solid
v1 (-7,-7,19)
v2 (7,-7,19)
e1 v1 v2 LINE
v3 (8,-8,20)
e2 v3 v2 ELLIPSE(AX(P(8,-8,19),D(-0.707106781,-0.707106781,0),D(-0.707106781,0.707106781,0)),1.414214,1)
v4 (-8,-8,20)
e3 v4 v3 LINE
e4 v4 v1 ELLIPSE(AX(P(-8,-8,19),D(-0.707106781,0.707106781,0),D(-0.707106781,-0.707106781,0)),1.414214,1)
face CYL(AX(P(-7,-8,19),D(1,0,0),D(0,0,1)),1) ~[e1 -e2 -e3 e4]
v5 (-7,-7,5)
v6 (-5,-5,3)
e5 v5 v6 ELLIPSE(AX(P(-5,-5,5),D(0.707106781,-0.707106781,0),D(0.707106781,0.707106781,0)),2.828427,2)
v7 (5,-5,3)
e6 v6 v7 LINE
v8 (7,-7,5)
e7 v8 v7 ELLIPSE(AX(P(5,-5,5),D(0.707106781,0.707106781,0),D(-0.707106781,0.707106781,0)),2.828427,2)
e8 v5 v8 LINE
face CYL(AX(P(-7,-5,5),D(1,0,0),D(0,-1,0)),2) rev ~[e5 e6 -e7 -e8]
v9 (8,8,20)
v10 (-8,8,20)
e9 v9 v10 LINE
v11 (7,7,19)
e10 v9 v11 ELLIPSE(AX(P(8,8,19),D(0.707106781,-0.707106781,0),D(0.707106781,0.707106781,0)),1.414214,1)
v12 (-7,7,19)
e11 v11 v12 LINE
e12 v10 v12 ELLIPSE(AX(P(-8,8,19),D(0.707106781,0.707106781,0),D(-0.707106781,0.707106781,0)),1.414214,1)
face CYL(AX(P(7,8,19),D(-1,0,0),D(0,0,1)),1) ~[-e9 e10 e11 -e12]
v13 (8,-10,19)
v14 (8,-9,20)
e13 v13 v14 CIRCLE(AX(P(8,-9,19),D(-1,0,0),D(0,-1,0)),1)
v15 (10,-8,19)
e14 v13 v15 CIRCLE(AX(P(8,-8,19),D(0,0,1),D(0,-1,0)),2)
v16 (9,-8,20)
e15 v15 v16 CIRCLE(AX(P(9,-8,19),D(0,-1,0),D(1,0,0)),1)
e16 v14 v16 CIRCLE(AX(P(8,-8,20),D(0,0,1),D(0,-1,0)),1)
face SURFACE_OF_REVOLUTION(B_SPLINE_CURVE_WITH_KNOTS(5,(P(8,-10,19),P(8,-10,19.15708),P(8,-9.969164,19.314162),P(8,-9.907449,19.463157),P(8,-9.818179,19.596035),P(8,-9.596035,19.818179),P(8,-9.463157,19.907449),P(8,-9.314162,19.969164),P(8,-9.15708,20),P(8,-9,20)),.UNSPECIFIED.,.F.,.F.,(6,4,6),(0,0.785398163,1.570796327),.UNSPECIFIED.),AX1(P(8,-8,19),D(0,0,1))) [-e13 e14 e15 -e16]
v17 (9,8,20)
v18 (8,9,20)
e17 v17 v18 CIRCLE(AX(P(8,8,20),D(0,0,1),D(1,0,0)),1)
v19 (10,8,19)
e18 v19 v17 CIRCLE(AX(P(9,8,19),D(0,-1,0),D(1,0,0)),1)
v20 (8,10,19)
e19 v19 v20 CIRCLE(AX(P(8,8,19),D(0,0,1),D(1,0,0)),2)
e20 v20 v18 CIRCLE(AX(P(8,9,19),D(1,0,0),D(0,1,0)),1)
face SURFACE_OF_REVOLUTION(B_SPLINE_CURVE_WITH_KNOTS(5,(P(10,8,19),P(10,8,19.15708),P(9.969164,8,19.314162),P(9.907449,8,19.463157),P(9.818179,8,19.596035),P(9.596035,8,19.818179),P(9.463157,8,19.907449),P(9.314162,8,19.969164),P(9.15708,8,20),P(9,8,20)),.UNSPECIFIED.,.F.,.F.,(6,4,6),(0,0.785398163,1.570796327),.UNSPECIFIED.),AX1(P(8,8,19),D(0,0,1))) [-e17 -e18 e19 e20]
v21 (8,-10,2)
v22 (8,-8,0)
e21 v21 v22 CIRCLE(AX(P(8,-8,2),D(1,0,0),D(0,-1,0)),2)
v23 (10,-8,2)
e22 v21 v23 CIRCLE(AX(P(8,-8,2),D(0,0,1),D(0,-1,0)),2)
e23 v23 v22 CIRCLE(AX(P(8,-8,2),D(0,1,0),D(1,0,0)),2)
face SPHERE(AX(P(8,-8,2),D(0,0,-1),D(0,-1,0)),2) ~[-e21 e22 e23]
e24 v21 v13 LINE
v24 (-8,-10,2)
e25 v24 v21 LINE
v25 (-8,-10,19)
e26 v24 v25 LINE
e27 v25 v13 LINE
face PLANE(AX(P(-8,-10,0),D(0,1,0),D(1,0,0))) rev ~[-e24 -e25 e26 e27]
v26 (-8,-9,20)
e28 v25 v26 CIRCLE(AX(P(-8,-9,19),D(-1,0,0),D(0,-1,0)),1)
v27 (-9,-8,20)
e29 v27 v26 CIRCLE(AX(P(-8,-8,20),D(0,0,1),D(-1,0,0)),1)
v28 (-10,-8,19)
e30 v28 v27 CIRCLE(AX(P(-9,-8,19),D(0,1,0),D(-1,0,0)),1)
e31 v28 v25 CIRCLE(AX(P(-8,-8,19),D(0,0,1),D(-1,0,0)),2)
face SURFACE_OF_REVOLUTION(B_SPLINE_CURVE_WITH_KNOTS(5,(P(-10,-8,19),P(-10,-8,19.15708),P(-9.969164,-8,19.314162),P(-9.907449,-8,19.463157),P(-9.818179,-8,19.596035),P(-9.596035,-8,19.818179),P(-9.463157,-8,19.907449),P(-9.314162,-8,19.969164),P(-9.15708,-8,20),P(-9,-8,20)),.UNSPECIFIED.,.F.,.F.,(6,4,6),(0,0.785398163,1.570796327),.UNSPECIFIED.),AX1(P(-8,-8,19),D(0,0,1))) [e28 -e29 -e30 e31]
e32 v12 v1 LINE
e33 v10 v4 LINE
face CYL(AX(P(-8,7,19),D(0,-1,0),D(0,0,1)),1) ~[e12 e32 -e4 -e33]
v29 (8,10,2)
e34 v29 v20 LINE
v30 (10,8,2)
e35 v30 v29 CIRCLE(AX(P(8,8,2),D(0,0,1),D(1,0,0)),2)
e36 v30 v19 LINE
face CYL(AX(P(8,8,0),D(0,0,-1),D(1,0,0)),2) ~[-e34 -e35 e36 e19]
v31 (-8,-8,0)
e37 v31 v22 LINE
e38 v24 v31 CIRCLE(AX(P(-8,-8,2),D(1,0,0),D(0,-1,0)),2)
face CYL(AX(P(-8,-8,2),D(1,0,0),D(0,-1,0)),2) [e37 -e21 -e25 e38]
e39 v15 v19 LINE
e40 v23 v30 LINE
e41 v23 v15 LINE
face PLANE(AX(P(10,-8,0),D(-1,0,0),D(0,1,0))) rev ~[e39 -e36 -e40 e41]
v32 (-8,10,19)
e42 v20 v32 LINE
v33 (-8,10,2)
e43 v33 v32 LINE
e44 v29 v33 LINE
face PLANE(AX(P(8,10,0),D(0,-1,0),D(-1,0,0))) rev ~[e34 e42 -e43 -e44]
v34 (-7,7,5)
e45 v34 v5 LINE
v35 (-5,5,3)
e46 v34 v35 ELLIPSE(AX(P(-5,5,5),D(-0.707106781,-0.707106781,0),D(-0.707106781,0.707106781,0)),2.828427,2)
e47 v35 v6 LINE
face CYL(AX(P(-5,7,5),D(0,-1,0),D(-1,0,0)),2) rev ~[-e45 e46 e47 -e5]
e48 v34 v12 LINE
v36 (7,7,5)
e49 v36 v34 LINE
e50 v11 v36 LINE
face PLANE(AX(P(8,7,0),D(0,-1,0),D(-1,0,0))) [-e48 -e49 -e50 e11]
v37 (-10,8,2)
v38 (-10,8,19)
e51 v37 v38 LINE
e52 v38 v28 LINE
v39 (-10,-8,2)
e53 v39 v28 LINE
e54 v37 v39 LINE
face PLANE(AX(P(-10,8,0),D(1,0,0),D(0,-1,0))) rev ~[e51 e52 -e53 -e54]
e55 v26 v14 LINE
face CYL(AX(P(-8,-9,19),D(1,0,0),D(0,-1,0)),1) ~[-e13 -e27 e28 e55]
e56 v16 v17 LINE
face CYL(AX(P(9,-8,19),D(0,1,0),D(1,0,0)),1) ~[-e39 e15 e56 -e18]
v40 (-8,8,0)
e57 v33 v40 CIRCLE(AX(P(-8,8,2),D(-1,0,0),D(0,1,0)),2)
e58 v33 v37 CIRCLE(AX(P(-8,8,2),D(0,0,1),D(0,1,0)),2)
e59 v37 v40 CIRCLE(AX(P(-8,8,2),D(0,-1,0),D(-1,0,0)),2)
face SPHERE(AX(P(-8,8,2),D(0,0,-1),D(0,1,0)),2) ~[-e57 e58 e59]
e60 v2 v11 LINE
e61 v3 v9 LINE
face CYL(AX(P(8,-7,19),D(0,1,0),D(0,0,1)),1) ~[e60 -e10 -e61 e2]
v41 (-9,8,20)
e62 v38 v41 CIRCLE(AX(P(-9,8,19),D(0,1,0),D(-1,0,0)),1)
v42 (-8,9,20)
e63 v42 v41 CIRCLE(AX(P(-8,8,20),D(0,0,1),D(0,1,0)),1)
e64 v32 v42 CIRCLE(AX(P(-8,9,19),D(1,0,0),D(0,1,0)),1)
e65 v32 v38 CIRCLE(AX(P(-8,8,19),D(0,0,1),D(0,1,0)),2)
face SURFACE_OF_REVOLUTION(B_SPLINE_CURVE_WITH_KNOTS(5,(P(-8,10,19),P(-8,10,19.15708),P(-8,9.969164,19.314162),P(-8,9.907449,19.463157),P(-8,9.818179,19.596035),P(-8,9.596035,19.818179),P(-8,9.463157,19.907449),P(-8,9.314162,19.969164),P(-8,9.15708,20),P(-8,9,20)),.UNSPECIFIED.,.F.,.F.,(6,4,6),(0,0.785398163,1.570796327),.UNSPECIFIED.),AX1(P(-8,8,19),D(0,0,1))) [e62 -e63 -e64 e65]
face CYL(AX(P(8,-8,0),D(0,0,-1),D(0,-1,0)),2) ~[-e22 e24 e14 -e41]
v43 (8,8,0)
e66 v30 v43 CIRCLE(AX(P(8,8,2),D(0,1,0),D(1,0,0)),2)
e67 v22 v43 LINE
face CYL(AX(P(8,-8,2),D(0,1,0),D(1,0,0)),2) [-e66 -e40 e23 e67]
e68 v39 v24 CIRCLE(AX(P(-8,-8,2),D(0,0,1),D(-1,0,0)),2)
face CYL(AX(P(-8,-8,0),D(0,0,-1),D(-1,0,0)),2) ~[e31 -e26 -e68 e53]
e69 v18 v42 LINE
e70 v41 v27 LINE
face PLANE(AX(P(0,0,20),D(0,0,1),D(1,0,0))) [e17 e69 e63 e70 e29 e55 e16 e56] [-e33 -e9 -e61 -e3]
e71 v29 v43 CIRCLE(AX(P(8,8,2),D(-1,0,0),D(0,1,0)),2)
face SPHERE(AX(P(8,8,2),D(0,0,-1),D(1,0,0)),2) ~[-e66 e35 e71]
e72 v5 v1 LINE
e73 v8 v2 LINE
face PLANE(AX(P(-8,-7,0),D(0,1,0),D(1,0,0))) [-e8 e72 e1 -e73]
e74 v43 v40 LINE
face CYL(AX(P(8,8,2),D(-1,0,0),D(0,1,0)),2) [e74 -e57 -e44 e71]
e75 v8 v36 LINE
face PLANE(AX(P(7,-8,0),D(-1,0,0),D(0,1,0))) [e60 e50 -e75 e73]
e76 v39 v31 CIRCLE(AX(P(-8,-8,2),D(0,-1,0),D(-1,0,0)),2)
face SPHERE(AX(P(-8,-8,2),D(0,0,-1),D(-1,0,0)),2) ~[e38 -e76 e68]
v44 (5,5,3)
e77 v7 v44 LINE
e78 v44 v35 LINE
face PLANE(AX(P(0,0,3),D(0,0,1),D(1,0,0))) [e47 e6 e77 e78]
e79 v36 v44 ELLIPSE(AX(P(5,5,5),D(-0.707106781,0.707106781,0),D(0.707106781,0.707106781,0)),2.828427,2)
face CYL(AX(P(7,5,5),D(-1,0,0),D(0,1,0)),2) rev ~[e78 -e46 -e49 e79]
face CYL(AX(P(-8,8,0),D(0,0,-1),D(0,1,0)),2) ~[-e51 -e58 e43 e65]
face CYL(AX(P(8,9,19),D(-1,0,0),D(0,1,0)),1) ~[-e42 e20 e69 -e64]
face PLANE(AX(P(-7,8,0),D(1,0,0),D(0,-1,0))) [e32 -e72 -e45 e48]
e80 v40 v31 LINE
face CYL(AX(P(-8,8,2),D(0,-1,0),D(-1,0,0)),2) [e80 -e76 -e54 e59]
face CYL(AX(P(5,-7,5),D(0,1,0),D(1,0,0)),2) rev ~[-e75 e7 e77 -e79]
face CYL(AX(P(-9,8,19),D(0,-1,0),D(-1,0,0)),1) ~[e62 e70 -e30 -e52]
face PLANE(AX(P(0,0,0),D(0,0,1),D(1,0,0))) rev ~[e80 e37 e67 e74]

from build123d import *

# Parameters (mm, degrees)
F1_DEPTH = 20
F2_R     = 2
F3_T     = -3
F4_R     = 1
F5_R     = 2


with BuildPart() as f1:
    # F0 (on Top) → F1 (new body)
    with BuildSketch(Plane.XY):
        with BuildLine():
            Line((8, 10), (-8, 10))
            ThreePointArc((-8, 10), (-9.4142135624, 9.4142135624), (-10, 8))
            Line((-10, 8), (-10, -8))
            ThreePointArc((-10, -8), (-9.4142135624, -9.4142135624), (-8, -10))
            Line((-8, -10), (8, -10))
            ThreePointArc((8, -10), (9.4142135624, -9.4142135624), (10, -8))
            Line((10, -8), (10, 8))
            ThreePointArc((10, 8), (9.4142135624, 9.4142135624), (8, 10))
        make_face()
    extrude(amount=F1_DEPTH)

    # F2
    f2_edges = [f1.edges().sort_by_distance(p)[0] for p in [
        (0, -10, 0),
    ]]
    fillet(f2_edges, radius=F2_R)

    # F3
    f3_openings = [f1.faces().sort_by_distance(p)[0] for p in [
        (0, 0, 20),
    ]]
    offset(amount=F3_T, openings=f3_openings)

    # F4
    f4_edges = [f1.edges().sort_by_distance(p)[0] for p in [
        (-10, 0, 20),
        (7, 0, 20),
        (0, 7, 20),
        (-7, 0, 20),
        (0, -7, 20),
        (0, 10, 20),
        (9.414214, 9.414214, 20),
        (-9.414214, 9.414214, 20),
        (10, 0, 20),
        (-9.414214, -9.414214, 20),
        (0, -10, 20),
        (9.414214, -9.414214, 20),
    ]]
    fillet(f4_edges, radius=F4_R)

    # F5
    f5_edges = [f1.edges().sort_by_distance(p)[0] for p in [
        (7, 0, 3),
        (0, -7, 3),
        (0, 7, 3),
        (-7, 0, 3),
    ]]
    fillet(f5_edges, radius=F5_R)


solid = f1.part
